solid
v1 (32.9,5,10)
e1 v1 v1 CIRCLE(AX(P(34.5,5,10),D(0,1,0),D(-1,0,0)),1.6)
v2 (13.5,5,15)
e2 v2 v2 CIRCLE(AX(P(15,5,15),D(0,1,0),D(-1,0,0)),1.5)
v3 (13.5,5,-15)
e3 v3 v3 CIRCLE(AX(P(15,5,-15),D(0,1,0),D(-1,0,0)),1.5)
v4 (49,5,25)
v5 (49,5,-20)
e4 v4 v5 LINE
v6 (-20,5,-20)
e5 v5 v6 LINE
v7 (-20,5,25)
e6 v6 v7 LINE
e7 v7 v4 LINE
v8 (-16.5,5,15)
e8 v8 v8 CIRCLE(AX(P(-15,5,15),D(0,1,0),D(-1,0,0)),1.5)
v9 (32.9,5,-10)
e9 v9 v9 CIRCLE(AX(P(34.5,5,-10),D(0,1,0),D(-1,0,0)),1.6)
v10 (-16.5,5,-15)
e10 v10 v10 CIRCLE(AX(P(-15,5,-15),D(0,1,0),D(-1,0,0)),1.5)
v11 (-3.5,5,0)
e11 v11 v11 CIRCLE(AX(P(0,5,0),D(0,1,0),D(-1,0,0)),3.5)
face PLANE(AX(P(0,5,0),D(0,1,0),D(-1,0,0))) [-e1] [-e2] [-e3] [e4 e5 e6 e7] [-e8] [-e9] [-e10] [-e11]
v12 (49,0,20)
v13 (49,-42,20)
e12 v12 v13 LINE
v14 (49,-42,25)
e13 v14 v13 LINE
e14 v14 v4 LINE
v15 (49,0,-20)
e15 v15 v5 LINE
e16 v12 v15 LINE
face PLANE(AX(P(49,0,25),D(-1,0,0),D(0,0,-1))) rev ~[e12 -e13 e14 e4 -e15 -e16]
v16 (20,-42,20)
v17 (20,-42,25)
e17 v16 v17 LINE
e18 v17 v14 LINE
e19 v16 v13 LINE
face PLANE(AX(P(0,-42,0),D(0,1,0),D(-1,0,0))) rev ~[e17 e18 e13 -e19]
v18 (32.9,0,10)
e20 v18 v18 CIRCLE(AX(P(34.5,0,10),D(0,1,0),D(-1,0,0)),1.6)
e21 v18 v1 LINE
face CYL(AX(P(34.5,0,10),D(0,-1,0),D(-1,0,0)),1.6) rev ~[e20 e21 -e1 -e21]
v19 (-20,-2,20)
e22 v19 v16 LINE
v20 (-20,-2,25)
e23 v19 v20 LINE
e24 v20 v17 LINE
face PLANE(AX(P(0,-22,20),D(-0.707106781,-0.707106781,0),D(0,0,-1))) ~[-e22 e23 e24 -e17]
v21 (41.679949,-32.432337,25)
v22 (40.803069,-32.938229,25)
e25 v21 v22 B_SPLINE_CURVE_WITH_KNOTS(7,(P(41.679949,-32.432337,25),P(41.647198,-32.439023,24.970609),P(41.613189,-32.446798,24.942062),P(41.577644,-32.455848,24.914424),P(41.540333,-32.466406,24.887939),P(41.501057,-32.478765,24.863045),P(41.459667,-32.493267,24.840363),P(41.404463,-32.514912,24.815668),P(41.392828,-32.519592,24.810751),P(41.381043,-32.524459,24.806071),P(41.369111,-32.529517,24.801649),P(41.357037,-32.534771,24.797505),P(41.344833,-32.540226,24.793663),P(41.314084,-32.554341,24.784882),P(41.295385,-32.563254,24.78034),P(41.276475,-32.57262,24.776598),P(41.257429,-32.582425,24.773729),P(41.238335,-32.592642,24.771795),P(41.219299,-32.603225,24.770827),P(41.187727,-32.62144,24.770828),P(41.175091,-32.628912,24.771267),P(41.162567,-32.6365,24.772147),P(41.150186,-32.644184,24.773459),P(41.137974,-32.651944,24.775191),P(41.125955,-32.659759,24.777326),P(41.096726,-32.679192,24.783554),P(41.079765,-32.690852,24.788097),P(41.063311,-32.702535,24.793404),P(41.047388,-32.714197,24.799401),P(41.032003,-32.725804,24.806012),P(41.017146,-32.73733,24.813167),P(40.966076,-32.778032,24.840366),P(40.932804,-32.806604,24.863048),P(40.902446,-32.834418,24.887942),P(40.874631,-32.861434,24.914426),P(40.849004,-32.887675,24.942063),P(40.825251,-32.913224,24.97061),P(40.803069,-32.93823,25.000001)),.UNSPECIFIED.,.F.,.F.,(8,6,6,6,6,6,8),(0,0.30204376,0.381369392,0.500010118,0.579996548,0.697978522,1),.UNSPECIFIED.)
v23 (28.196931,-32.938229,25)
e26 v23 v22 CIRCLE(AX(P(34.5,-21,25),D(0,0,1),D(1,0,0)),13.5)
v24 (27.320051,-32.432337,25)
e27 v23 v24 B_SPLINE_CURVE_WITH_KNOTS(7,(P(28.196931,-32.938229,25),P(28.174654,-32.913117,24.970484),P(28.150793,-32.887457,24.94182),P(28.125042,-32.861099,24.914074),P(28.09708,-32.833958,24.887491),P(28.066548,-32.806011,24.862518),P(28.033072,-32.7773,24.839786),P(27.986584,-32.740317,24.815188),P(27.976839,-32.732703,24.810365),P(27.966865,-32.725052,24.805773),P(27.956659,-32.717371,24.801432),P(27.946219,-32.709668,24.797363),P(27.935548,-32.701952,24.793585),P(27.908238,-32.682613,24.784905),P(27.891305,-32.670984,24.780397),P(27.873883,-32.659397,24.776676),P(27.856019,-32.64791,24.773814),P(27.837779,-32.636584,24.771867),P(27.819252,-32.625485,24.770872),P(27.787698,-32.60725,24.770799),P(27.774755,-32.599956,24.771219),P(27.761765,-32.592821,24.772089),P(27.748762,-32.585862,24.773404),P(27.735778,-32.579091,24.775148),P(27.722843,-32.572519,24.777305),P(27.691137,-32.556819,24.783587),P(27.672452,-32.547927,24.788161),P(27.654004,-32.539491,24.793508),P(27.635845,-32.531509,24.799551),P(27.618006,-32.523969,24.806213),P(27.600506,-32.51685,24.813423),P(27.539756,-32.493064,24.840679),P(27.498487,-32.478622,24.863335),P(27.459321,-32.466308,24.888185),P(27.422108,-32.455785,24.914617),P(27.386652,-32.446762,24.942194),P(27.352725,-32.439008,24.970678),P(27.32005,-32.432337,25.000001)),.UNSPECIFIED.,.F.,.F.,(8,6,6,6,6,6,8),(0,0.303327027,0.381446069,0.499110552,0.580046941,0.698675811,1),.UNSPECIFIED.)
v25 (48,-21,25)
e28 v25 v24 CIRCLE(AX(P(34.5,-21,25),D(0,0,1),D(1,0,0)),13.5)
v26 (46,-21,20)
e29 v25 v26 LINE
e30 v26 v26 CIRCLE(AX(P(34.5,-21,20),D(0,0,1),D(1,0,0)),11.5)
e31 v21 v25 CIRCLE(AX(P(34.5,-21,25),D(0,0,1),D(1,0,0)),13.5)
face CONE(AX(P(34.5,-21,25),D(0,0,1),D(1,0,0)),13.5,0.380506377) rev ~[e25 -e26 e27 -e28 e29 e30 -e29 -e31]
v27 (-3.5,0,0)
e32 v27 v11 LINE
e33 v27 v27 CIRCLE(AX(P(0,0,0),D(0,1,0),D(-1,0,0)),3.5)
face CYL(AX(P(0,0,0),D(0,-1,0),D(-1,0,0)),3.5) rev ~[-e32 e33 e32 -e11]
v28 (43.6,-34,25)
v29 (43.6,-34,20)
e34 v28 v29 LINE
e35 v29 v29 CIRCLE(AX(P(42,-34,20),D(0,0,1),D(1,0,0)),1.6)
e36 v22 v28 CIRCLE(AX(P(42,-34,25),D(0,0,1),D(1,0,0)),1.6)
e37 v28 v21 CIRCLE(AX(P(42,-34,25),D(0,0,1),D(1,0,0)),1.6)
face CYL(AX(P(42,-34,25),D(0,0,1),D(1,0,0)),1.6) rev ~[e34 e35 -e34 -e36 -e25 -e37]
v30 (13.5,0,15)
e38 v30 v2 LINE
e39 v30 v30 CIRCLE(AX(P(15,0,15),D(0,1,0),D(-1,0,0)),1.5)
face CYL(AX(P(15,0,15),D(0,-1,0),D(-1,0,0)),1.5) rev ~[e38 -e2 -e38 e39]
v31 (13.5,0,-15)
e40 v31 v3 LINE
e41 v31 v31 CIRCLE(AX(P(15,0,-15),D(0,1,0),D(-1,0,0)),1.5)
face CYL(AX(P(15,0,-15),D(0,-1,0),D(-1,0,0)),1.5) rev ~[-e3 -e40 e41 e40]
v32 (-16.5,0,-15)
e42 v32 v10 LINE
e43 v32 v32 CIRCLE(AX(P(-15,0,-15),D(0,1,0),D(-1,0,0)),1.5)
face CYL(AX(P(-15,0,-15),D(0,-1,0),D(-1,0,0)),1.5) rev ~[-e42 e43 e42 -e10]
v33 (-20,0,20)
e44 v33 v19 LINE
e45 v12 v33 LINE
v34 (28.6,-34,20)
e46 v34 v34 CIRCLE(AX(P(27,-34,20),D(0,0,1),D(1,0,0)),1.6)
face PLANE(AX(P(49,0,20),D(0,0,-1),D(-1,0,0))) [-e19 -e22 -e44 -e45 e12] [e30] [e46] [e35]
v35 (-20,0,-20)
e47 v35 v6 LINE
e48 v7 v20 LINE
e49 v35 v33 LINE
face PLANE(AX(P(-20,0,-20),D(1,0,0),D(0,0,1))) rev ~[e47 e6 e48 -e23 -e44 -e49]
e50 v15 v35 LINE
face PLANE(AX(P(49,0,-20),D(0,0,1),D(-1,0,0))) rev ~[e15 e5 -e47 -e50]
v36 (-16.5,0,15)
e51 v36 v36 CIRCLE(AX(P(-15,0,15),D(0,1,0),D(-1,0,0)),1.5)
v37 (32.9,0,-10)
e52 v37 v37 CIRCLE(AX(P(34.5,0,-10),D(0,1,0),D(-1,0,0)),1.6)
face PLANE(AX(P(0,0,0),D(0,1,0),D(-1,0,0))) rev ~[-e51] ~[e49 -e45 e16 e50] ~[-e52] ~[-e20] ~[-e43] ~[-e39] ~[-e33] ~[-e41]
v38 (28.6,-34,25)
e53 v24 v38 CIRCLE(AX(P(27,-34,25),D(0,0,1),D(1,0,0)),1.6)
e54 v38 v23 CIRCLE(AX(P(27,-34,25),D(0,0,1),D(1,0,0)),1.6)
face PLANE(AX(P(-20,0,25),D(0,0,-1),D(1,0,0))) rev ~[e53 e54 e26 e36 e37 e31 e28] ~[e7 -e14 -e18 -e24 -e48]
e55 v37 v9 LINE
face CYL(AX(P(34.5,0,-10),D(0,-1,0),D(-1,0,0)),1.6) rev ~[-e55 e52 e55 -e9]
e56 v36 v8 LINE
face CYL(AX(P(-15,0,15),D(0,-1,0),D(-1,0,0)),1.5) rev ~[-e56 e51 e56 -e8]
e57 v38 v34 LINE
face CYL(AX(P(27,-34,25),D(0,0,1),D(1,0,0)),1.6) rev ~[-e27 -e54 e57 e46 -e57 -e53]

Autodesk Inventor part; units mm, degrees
ref_plane "YZ Plane" through (0, 0, 0) normal (1, 0, 0) x (0, 1, 0)
ref_plane "XZ Plane" through (0, 0, 0) normal (0, 1, 0) x (-1, 0, 0)
ref_plane "XY Plane" through (0, 0, 0) normal (0, 0, 1) x (1, 0, 0)
sketch "Sketch1" plane through (0, 0, 0) normal (0, 1, 0) x (-1, 0, 0)
  line L0 (-20, 20) -> (20, 20)
  line L1 (20, 20) -> (20, -20)
  line L2 (20, -20) -> (-20, -20)
  line L3 (-20, -20) -> (-20, 20)
  line L4 (-20, 20) -> (20, -20) construction
  line L5 (20, 20) -> (-20, -20) construction
  circle A0 centre (15, -15) radius 1.5
  circle A1 centre (-15, -15) radius 1.5
  circle A2 centre (-15, 15) radius 1.5
  circle A3 centre (15, 15) radius 1.5
  line L6 (15, 15) -> (15, -15) construction
  line L7 (-15, -15) -> (15, -15) construction
  line L8 (-15, -15) -> (-15, 15) construction
  line L9 (-20, 20) -> (-49, 20)
  line L10 (-49, 20) -> (-49, -20)
  line L11 (-49, -20) -> (-20, -20)
  circle A4 centre (0, 0) radius 3.5
  line L12 (20, 20) -> (20, 25)
  line L13 (20, 25) -> (-49, 25)
  line L14 (-49, 25) -> (-49, 20)
  line L15 (-34.5, -20) -> (-34.5, -10) construction
  line L16 (-34.5, -10) -> (-34.5, 10) construction
  circle A5 centre (-34.5, -10) radius 1.6
  circle A6 centre (-34.5, 10) radius 1.6
  dimension "d0" = 40
  dimension "d1" = 40
  dimension "d2" = 30
  dimension "d3" = 3
  dimension "d26" = 7
  dimension "d27" = 29
  dimension "d29" = 5
  dimension "d40" = 10
  dimension "d41" = 20
  dimension "d42" = 3.2
sketch "Sketch1 outline for Extrusion1" plane through (0, 0, 0) normal (0, 1, 0) x (-1, 0, 0)
  line L0 (-49, 25) -> (-49, -20)
  line L1 (-49, -20) -> (20, -20)
  line L2 (20, -20) -> (20, 25)
  line L3 (20, 25) -> (-49, 25)
  circle A0 centre (15, 15) radius 1.5
  circle A1 centre (0, 0) radius 3.5
  circle A2 centre (-34.5, -10) radius 1.6
  circle A3 centre (-15, -15) radius 1.5
  circle A4 centre (15, -15) radius 1.5
  circle A5 centre (-34.5, 10) radius 1.6
  circle A6 centre (-15, 15) radius 1.5
extrude "Extrusion1" add sketch "Sketch1 outline for Extrusion1" along normal blind 5
sketch "Sketch1 outline for Extrusion4" plane through (0, 0, 0) normal (0, 1, 0) x (-1, 0, 0)
  line L0 (-49, 25) -> (-49, 20)
  line L1 (20, 25) -> (-49, 25)
  line L2 (20, 20) -> (20, 25)
  line L3 (-20, 20) -> (20, 20)
  line L4 (-49, 20) -> (-20, 20)
extrude "Extrusion4" add sketch "Sketch1 outline for Extrusion4" against normal blind 42
sketch "Sketch2" plane through (-20, 5, 25) normal (0, 0, 1) x (1, 0, 0)
  line L0 (69, -47) -> (69, 0)
  line L1 (0, 0) -> (69, 0)
  line L2 (0, -47) -> (0, 0)
  line L3 (69, -47) -> (0, -47)
  line L4 (69, -47) -> (40, -47)
  line L5 (40, -47) -> (40, 0)
  line L6 (40, 0) -> (69, 0)
  line L7 (69, 0) -> (69, -47)
  circle A0 centre (54.5, -26) radius 11.5
  line L8 (54.5, -26) -> (54.5, -47) construction
  line L9 (69, -47) -> (0, -47)
  line L10 (43, -32.639528) -> (43, -19.360472)
  line L11 (43, -19.360472) -> (54.5, -12.720944)
  line L12 (54.5, -12.720944) -> (66, -19.360472)
  line L13 (66, -19.360472) -> (66, -32.639528)
  line L14 (66, -32.639528) -> (54.5, -39.279056)
  line L15 (54.5, -39.279056) -> (43, -32.639528)
  line L16 (54.5, -39) -> (62, -39) construction
  line L17 (54.5, -39) -> (47, -39) construction
  circle A1 centre (62, -39) radius 1.6
  circle A2 centre (47, -39) radius 1.6
  point P0 (20, -5)
  point P1 (54.5, -26)
  point P2 (48.75, -35.959292)
  point P3 (60.25, -35.959292)
  point P4 (43, -26)
  point P5 (66, -26)
  point P6 (60.25, -16.040708)
  point P7 (48.75, -16.040708)
  dimension "d32" = 29
  dimension "d33" = 21
  dimension "d34" = 23
  dimension "d37" = 3.2
  dimension "d39" = 8
  dimension "d46" = 15
sketch "Sketch2 outline for Extrusion5" plane through (-20, 5, 25) normal (0, 0, 1) x (1, 0, 0)
  circle A0 centre (62, -39) radius 1.6
  circle A1 centre (47, -39) radius 1.6
  circle A2 centre (54.5, -26) radius 11.5
extrude "Extrusion5" cut sketch "Sketch2 outline for Extrusion5" against normal up to surface (5 mm away)
chamfer "Chamfer4" distance 40 angle 45 1 edges at (-20, -42, 22.5)
chamfer "Chamfer5" distance 2 distance2 5 1 edges at (23, -21, 25)
properties part number "Tensioner Top_3DPrint"
